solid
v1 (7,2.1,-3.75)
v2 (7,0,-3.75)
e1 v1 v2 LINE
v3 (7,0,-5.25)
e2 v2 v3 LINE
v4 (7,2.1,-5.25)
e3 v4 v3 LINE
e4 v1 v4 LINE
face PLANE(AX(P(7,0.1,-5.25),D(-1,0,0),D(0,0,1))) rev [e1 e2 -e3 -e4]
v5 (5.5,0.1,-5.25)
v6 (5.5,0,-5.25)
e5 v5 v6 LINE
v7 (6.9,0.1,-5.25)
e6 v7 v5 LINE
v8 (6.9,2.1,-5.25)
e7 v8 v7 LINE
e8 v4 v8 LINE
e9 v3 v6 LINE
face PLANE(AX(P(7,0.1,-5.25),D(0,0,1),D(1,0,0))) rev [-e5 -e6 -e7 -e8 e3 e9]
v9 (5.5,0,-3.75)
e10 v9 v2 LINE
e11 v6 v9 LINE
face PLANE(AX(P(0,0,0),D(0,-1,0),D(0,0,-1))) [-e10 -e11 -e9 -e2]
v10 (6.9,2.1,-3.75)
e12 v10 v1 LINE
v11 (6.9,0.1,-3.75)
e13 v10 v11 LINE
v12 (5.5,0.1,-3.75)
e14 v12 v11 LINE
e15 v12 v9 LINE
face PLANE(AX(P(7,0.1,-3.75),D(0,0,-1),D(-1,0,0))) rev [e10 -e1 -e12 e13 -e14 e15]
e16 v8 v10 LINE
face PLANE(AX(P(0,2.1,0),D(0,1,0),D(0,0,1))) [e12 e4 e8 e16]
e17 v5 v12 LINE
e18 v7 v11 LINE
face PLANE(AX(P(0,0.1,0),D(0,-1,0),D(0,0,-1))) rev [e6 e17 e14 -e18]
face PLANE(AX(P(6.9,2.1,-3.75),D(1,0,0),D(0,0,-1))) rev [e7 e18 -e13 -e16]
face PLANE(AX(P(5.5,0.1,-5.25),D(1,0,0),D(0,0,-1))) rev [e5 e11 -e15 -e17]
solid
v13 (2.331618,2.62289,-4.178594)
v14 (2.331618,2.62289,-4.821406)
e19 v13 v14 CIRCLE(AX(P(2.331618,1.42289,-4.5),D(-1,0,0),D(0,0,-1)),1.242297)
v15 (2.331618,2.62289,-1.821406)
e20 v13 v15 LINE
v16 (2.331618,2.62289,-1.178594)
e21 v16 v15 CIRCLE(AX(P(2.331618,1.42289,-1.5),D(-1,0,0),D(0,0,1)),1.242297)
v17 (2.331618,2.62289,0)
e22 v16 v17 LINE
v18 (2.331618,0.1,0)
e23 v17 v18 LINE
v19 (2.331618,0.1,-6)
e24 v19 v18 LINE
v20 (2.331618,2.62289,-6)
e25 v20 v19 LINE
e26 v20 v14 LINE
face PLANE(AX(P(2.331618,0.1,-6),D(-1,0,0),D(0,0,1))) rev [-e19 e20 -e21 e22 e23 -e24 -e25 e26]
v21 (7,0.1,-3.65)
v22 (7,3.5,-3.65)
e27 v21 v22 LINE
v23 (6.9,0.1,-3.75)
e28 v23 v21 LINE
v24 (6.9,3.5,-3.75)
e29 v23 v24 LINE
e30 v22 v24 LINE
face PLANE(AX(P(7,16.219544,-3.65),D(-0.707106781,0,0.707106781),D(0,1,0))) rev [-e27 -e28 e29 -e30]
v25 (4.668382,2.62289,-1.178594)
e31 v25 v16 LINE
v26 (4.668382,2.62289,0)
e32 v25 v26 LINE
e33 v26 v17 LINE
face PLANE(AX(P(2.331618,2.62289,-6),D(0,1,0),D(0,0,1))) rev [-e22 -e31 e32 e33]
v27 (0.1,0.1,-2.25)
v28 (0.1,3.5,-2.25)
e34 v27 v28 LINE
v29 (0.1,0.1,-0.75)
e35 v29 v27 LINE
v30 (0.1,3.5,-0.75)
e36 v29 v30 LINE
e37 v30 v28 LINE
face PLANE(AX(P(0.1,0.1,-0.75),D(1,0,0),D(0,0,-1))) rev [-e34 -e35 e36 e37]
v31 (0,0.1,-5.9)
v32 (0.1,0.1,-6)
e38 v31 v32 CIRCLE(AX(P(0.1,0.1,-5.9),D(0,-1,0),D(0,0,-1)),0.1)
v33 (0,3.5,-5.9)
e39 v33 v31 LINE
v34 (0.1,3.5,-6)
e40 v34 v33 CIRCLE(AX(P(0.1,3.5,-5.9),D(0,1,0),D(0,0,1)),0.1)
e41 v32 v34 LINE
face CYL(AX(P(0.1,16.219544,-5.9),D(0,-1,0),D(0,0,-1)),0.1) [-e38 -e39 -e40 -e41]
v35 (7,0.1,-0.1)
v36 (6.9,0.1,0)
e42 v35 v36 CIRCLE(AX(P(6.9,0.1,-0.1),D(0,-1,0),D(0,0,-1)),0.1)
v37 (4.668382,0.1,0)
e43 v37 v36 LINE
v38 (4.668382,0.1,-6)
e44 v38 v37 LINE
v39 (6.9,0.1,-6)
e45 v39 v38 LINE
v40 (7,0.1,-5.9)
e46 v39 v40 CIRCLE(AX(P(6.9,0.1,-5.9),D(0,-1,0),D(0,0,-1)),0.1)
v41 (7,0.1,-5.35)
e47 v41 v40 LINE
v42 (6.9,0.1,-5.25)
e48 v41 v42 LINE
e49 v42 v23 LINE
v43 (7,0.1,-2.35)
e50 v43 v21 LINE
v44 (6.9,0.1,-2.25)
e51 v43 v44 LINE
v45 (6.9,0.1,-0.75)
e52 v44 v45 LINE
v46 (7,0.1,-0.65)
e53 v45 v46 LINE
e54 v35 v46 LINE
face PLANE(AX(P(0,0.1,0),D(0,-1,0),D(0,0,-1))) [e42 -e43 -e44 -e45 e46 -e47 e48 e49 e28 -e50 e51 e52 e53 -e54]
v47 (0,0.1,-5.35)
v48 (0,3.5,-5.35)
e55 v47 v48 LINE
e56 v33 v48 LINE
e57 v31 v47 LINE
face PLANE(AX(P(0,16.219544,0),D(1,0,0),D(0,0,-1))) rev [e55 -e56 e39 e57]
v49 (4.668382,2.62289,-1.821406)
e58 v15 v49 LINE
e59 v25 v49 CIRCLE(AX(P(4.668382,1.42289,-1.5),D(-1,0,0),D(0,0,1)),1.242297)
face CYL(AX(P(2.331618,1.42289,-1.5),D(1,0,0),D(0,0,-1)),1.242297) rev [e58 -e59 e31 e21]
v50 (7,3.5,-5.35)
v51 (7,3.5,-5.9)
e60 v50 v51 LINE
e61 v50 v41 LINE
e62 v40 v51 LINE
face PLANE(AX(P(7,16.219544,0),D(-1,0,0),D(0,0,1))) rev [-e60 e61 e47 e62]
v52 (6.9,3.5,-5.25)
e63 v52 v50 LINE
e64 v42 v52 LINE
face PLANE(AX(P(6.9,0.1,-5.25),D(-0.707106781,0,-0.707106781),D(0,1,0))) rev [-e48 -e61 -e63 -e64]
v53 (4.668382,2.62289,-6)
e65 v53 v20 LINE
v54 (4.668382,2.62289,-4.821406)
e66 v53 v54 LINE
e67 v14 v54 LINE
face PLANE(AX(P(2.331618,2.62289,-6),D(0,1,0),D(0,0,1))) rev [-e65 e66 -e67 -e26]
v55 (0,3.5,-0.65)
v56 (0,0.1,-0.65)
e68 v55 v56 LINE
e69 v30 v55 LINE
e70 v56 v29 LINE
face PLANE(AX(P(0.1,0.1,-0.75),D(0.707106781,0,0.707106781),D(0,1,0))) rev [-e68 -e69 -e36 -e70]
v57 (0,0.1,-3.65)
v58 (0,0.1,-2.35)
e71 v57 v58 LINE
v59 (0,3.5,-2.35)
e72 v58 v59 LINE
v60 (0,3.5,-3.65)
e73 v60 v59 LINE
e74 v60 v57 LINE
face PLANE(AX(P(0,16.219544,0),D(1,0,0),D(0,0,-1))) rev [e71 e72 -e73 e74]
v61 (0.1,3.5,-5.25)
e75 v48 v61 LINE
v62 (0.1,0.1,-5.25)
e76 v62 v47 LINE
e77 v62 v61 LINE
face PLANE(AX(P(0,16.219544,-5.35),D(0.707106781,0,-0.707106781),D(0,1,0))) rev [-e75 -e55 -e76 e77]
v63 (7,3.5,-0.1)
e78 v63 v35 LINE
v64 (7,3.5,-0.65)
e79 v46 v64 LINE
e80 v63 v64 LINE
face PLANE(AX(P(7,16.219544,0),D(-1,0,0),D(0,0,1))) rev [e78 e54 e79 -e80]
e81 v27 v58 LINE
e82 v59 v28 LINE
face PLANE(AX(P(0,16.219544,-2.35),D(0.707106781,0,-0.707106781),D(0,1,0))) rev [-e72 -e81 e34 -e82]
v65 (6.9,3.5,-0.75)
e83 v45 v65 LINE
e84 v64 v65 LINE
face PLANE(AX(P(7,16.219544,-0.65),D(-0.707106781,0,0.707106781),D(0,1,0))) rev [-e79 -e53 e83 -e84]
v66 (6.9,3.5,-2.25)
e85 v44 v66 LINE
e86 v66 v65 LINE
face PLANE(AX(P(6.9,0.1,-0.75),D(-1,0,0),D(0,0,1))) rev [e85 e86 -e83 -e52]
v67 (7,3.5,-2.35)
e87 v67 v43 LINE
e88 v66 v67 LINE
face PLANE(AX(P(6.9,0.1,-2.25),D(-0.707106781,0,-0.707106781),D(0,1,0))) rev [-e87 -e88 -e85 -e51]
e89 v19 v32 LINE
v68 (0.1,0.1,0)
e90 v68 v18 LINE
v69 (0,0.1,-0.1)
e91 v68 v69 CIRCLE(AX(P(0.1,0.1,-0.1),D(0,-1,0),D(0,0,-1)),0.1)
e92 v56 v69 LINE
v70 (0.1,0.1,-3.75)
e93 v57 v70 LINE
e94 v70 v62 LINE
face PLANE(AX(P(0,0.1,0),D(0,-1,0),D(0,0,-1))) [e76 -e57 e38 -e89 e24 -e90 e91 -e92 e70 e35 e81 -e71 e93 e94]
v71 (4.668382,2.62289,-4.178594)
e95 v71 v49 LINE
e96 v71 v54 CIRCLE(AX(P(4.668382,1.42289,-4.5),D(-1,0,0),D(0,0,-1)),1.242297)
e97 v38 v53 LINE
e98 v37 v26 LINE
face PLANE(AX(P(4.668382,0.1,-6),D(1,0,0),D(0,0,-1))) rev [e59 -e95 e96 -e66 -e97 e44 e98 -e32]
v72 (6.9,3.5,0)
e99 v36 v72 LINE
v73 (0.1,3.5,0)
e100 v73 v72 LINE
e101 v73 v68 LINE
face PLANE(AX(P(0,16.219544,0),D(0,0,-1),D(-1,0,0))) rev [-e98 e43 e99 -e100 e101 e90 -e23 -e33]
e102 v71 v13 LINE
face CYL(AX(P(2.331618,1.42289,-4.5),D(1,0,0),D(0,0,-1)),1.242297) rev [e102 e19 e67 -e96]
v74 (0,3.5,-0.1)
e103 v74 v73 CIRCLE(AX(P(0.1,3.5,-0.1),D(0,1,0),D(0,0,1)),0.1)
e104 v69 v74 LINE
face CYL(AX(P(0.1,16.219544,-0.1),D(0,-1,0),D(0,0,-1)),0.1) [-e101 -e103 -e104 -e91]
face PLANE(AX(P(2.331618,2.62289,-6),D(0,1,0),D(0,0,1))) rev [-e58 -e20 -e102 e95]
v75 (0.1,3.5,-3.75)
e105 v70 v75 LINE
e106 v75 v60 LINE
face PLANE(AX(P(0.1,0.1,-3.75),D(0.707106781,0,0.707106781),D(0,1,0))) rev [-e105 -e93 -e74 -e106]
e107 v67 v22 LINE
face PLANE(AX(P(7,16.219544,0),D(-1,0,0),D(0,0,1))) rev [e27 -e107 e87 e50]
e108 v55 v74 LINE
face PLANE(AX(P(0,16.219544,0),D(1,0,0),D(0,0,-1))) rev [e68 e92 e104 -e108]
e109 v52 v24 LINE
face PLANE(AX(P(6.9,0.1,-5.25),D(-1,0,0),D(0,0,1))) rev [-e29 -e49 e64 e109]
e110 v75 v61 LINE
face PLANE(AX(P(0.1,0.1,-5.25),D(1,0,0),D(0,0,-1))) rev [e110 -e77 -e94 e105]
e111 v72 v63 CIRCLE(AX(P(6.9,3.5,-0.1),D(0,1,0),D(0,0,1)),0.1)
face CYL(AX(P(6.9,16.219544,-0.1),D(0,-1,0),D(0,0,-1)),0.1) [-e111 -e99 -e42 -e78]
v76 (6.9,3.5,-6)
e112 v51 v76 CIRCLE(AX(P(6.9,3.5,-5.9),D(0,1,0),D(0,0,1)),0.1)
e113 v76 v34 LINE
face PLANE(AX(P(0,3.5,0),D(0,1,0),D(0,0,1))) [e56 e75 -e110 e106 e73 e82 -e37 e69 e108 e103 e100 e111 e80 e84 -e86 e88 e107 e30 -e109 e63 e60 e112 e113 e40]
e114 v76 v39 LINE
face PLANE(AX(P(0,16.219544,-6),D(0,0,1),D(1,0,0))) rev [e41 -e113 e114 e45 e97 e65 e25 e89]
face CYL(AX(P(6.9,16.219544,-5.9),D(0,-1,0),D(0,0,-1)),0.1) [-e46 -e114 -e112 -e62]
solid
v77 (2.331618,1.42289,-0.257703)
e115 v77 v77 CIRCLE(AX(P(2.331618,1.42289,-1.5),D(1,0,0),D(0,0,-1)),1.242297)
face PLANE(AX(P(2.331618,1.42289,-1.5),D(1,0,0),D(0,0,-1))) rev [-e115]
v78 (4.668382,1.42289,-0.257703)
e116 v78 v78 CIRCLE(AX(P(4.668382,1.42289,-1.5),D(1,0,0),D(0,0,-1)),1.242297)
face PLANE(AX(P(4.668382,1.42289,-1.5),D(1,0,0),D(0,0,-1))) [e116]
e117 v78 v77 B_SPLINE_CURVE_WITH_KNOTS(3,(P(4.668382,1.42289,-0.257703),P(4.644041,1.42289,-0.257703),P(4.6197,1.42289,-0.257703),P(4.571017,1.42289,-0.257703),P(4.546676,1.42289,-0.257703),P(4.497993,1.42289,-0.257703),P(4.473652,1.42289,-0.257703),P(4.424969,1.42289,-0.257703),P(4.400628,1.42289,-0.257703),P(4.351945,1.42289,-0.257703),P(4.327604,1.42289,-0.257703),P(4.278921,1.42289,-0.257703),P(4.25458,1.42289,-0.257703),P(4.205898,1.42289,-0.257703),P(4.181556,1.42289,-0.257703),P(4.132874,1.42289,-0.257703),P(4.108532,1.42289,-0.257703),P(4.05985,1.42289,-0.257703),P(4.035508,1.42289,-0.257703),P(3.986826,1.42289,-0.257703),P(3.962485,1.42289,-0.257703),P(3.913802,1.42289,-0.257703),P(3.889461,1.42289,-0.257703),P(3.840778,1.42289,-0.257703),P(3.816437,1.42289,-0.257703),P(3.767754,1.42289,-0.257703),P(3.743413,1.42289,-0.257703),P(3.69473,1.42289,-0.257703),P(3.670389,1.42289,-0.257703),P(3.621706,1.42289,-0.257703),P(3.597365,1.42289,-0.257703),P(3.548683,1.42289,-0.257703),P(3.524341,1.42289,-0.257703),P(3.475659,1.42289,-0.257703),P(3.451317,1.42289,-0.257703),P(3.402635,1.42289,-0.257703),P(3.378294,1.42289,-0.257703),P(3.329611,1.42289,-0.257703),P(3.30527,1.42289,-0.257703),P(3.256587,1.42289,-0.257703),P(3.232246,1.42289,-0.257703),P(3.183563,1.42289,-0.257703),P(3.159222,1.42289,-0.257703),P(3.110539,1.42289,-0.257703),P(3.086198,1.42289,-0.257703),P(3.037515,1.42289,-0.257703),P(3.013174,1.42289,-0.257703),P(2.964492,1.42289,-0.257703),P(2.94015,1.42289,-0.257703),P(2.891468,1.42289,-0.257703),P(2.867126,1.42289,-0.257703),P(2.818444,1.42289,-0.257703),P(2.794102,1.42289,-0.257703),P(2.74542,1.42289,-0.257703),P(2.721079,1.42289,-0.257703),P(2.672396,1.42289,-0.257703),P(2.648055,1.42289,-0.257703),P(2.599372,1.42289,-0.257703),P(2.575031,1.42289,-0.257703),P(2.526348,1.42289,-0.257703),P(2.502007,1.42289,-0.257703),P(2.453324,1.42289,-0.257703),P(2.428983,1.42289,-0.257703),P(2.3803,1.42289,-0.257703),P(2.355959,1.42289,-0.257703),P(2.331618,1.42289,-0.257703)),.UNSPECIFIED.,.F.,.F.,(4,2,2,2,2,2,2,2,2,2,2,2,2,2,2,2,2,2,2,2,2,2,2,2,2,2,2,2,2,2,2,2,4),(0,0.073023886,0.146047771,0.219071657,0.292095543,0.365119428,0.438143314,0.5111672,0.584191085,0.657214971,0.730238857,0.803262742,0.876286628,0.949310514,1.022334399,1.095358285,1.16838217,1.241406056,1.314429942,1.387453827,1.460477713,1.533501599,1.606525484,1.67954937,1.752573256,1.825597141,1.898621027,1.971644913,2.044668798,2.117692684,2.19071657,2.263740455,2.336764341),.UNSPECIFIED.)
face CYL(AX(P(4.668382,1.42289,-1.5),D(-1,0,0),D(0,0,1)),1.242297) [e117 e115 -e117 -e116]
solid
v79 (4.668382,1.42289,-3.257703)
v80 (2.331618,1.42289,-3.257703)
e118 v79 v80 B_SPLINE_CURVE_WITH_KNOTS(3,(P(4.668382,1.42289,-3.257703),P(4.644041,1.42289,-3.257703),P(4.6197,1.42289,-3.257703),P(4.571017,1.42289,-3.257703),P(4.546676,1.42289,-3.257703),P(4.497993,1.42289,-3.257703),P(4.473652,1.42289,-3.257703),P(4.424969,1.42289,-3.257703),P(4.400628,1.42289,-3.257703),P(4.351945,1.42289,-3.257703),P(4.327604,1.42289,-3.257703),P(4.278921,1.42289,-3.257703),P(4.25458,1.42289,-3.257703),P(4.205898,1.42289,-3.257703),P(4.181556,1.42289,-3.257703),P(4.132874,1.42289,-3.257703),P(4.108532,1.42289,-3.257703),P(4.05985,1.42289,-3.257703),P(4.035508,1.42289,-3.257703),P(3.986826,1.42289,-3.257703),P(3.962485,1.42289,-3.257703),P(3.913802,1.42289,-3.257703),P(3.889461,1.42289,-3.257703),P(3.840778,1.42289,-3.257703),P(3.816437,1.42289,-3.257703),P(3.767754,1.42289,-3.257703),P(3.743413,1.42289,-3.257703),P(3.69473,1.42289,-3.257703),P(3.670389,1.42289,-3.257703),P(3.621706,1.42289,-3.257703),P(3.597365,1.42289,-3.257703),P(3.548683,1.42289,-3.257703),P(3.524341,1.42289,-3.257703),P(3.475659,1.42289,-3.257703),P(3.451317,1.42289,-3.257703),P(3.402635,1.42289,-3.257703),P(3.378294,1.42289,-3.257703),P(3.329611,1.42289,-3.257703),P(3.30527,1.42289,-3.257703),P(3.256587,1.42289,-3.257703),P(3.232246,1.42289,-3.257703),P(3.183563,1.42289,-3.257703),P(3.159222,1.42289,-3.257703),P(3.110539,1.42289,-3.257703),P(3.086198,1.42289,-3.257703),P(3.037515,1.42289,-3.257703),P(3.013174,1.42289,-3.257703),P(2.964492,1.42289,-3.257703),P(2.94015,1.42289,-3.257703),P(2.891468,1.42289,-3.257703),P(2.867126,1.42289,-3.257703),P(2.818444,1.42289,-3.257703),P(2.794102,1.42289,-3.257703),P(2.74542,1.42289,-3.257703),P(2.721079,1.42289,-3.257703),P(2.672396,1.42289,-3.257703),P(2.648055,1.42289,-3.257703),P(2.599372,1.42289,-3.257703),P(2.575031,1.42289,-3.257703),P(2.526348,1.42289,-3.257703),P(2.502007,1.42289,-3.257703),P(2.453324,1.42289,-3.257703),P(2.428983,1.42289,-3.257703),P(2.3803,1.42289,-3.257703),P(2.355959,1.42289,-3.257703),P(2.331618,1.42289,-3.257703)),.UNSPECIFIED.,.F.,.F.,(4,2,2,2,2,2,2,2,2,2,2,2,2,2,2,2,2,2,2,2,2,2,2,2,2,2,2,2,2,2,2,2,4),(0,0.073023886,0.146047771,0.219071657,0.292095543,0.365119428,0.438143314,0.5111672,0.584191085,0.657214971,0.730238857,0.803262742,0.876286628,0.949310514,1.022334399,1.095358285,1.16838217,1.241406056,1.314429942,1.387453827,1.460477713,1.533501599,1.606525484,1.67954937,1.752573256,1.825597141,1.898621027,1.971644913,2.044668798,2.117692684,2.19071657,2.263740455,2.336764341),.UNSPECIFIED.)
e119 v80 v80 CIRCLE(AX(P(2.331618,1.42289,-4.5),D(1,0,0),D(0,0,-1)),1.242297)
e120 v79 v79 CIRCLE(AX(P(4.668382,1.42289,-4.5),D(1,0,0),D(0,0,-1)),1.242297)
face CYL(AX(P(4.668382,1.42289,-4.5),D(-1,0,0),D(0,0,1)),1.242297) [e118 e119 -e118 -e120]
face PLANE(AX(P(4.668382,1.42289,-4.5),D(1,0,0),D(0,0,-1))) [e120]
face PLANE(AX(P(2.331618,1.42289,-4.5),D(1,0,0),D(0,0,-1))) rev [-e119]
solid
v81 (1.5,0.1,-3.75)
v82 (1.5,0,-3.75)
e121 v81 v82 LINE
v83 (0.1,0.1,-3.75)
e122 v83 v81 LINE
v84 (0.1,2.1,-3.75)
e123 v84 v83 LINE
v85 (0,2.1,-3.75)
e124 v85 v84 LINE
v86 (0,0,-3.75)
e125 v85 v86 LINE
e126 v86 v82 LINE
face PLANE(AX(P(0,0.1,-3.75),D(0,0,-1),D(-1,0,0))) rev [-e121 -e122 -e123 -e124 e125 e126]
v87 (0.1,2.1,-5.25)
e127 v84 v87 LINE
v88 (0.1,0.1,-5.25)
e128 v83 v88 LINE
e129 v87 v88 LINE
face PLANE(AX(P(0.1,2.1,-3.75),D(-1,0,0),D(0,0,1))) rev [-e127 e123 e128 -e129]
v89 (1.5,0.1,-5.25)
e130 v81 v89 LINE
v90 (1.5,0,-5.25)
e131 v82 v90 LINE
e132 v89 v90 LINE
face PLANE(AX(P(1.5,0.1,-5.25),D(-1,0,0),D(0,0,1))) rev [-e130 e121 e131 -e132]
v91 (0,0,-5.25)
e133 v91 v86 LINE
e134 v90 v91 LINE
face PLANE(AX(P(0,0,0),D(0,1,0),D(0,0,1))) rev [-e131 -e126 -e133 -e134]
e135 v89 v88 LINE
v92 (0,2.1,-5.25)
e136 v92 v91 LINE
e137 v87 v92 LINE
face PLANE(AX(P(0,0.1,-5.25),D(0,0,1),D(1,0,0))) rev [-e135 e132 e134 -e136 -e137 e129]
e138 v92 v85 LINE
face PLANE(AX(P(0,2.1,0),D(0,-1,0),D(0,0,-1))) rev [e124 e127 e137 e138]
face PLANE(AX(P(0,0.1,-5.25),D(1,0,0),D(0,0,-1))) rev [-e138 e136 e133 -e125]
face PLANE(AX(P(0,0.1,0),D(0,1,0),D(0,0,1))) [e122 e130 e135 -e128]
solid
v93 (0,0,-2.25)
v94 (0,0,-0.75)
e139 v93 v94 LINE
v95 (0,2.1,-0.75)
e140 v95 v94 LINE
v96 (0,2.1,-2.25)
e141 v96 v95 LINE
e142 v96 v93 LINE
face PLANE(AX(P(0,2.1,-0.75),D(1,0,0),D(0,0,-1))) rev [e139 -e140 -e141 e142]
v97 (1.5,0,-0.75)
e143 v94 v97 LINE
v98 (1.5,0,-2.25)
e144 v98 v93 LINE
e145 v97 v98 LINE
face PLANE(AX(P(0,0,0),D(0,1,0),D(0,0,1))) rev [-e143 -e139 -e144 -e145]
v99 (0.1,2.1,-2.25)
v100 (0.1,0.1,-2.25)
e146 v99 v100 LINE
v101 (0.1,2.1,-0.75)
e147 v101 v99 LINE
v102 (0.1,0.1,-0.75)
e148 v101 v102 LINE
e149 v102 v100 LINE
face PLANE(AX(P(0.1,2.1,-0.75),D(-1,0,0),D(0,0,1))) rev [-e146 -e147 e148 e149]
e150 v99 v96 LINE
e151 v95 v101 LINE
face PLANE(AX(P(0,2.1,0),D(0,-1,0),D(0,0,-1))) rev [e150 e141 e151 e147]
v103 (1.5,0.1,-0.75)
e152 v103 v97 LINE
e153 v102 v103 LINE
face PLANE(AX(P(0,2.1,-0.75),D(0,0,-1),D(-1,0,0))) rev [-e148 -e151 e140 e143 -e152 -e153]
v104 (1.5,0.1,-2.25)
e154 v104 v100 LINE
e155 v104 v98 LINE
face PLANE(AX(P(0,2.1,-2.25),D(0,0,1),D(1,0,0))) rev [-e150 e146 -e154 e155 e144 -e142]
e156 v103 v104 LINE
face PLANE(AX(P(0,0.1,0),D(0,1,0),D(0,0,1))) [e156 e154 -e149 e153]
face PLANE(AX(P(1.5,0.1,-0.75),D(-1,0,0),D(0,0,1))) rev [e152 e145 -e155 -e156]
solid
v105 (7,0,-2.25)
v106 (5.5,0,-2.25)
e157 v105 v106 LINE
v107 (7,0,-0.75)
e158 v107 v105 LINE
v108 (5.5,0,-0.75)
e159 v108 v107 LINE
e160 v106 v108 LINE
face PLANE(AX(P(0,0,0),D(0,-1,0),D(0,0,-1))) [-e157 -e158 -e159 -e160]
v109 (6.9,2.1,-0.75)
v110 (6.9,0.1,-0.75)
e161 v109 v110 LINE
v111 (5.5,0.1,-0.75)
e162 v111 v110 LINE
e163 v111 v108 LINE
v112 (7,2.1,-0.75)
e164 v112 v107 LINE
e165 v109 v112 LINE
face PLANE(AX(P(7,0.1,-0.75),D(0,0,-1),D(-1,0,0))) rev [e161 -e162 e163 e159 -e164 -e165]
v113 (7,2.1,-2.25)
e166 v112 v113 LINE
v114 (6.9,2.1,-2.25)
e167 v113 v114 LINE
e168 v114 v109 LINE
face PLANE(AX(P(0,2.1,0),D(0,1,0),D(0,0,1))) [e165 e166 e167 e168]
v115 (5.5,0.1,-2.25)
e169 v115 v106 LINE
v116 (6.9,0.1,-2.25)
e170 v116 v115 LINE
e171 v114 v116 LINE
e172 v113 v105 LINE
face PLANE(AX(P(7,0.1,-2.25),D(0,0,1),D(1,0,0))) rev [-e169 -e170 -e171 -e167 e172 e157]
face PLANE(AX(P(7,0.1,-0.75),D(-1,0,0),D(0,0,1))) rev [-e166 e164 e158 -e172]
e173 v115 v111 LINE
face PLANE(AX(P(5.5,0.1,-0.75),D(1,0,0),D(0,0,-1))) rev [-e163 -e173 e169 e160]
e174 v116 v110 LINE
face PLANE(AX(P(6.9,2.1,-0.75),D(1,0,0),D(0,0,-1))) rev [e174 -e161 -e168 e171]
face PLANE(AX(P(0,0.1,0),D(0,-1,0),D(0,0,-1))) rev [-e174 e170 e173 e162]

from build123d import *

# Parameters (mm, degrees)
SKETCH2_W             = 1.5
SKETCH2_H             = 1.5
BOSS_EXTRUDE1_DEPTH   = 0.1
BOSS_EXTRUDE1_2_DEPTH = 0.1
BOSS_EXTRUDE1_3_DEPTH = 0.1
BOSS_EXTRUDE1_4_DEPTH = 0.1
BOSS_EXTRUDE2_START   = 0.1
SKETCH5_W             = 7
SKETCH5_H             = 6
BOSS_EXTRUDE2_DEPTH   = 3.4
SKETCH6_W             = 0.1
SKETCH6_H             = 1.5
CUT_EXTRUDE1_DEPTH    = 3.4
SKETCH7_W             = 0.1
SKETCH7_H             = 1.5
BOSS_EXTRUDE4_DEPTH   = 2
BOSS_EXTRUDE4_2_DEPTH = 2
BOSS_EXTRUDE4_3_DEPTH = 2
BOSS_EXTRUDE4_4_DEPTH = 2
CHAMFER1_SIZE         = 0.1
FILLET1_R             = 0.1
SKETCH8_W             = 2.33676434
SKETCH8_H             = 2.522890168
CUT_EXTRUDE2_DEPTH    = 10.861541462
SKETCH9_R             = 1.242296886
BOSS_EXTRUDE5_DEPTH   = 2.336762
BOSS_EXTRUDE5_2_DEPTH = 2.336762
SKETCH10_R            = 1.242296886
BOSS_EXTRUDE6_DEPTH   = 2.336764
BOSS_EXTRUDE6_2_DEPTH = 2.336764


with BuildPart() as part:
    # Sketch2 → Boss-Extrude1 (new body)
    with BuildSketch(Plane(origin=(0, 0, 0), x_dir=(1, 0, 0), z_dir=(0, 1, 0))):
        with Locations((6.25, 4.5)):
            Rectangle(SKETCH2_W, SKETCH2_H)
    extrude(amount=BOSS_EXTRUDE1_DEPTH)


with BuildPart() as body_2:
    # Sketch2 → Boss-Extrude1 2 (new body)
    with BuildSketch(Plane(origin=(0, 0, 0), x_dir=(1, 0, 0), z_dir=(0, 1, 0))):
        with Locations((0.75, 4.5)):
            Rectangle(SKETCH2_W, SKETCH2_H)
    extrude(amount=BOSS_EXTRUDE1_2_DEPTH)


with BuildPart() as body_3:
    # Sketch2 → Boss-Extrude1 3 (new body)
    with BuildSketch(Plane(origin=(0, 0, 0), x_dir=(1, 0, 0), z_dir=(0, 1, 0))):
        with Locations((6.25, 1.5)):
            Rectangle(SKETCH2_W, SKETCH2_H)
    extrude(amount=BOSS_EXTRUDE1_3_DEPTH)


with BuildPart() as body_4:
    # Sketch2 → Boss-Extrude1 4 (new body)
    with BuildSketch(Plane(origin=(0, 0, 0), x_dir=(1, 0, 0), z_dir=(0, 1, 0))):
        with Locations((0.75, 1.5)):
            Rectangle(SKETCH2_W, SKETCH2_H)
    extrude(amount=BOSS_EXTRUDE1_4_DEPTH)


with BuildPart() as body_5:
    # Sketch5 → Boss-Extrude2 (new body)
    with BuildSketch(Plane(origin=(0, 0, 0), x_dir=(1, 0, 0), z_dir=(0, 1, 0)).offset(BOSS_EXTRUDE2_START)):
        with Locations((3.5, 3)):
            Rectangle(SKETCH5_W, SKETCH5_H)
    extrude(amount=BOSS_EXTRUDE2_DEPTH)

    # Sketch6 → Cut-Extrude1 (cut)
    with BuildSketch(Plane(origin=(0, 3.5, 0), x_dir=(1, 0, 0), z_dir=(0, 1, 0))):
        with Locations((6.95, 1.5)):
            Rectangle(SKETCH6_W, SKETCH6_H)
        with Locations((6.95, 4.5)):
            Rectangle(SKETCH6_W, SKETCH6_H)
        with Locations((0.05, 4.5)):
            Rectangle(SKETCH6_W, SKETCH6_H)
        with Locations((0.05, 1.5)):
            Rectangle(SKETCH6_W, SKETCH6_H)
    extrude(amount=-CUT_EXTRUDE1_DEPTH, mode=Mode.SUBTRACT)

    # Chamfer1
    chamfer1_edges = [body_5.edges().sort_by_distance(p)[0] for p in [
        (0, 1.8, -0.75),
        (0, 1.8, -2.25),
        (0, 1.8, -3.75),
        (0, 1.8, -5.25),
        (7, 1.8, -5.25),
        (7, 1.8, -0.75),
        (7, 1.8, -3.75),
        (7, 1.8, -2.25),
    ]]
    chamfer(chamfer1_edges, length=CHAMFER1_SIZE - 0.0001)  # a hair under: the kernel refuses the full size

    # Fillet1
    fillet1_edges = [body_5.edges().sort_by_distance(p)[0] for p in [
        (0, 1.8, 0),
        (7, 1.8, 0),
        (7, 1.8, -6),
        (0, 1.8, -6),
    ]]
    fillet(fillet1_edges, radius=FILLET1_R)

    # Sketch8 → Cut-Extrude2 (cut, through all)
    with BuildSketch(Plane.XY):
        with Locations((3.5, 1.361445084)):
            Rectangle(SKETCH8_W, SKETCH8_H)
    extrude(amount=-CUT_EXTRUDE2_DEPTH, mode=Mode.SUBTRACT)


with BuildPart() as body_6:
    # Sketch7 → Boss-Extrude4 (new body)
    with BuildSketch(Plane(origin=(0, 0.1, 0), x_dir=(1, 0, 0), z_dir=(0, 1, 0))):
        with Locations((6.95, 1.5)):
            Rectangle(SKETCH7_W, SKETCH7_H)
    extrude(amount=BOSS_EXTRUDE4_DEPTH)


with BuildPart() as body_7:
    # Sketch7 → Boss-Extrude4 2 (new body)
    with BuildSketch(Plane(origin=(0, 0.1, 0), x_dir=(1, 0, 0), z_dir=(0, 1, 0))):
        with Locations((6.95, 4.5)):
            Rectangle(SKETCH7_W, SKETCH7_H)
    extrude(amount=BOSS_EXTRUDE4_2_DEPTH)


with BuildPart() as body_8:
    # Sketch7 → Boss-Extrude4 3 (new body)
    with BuildSketch(Plane(origin=(0, 0.1, 0), x_dir=(1, 0, 0), z_dir=(0, 1, 0))):
        with Locations((0.05, 1.5)):
            Rectangle(SKETCH7_W, SKETCH7_H)
    extrude(amount=BOSS_EXTRUDE4_3_DEPTH)

    # Combine1: union body 4
    add(body_4.part)


with BuildPart() as body_9:
    # Sketch7 → Boss-Extrude4 4 (new body)
    with BuildSketch(Plane(origin=(0, 0.1, 0), x_dir=(1, 0, 0), z_dir=(0, 1, 0))):
        with Locations((0.05, 4.5)):
            Rectangle(SKETCH7_W, SKETCH7_H)
    extrude(amount=BOSS_EXTRUDE4_4_DEPTH)


with BuildPart() as body_2_1:
    add(body_2.part)

    # Combine2: union body 9
    add(body_9.part)


with BuildPart() as part_1:
    add(part.part)

    # Combine3: union body 7
    add(body_7.part)


with BuildPart() as body_3_1:
    add(body_3.part)

    # Combine4: union body 6
    add(body_6.part)


with BuildPart() as body_6_2:
    # Sketch9 → Boss-Extrude5 (new body)
    with BuildSketch(Plane.ZY.offset(-4.66838217)):
        with Locations(Location((-1.5, 1.422890168, 0), (0, 0, 180))):
            Circle(SKETCH9_R)
    extrude(amount=BOSS_EXTRUDE5_DEPTH)


with BuildPart() as body_7_2:
    # Sketch9 → Boss-Extrude5 2 (new body)
    with BuildSketch(Plane.ZY.offset(-4.66838217)):
        with Locations(Location((-4.5, 1.422890168, 0), (0, 0, 180))):
            Circle(SKETCH9_R)
    extrude(amount=BOSS_EXTRUDE5_2_DEPTH)


with BuildPart() as body_5_1:
    add(body_5.part)

    # Combine6: cut body 6 2, body 7 2
    add(body_6_2.part, mode=Mode.SUBTRACT)
    add(body_7_2.part, mode=Mode.SUBTRACT)


with BuildPart() as body_6_3:
    # Sketch10 → Boss-Extrude6 (new body)
    with BuildSketch(Plane(origin=(2.33161783, 0, 0), x_dir=(0, 0, -1), z_dir=(1, 0, 0))):
        with Locations(Location((1.5, 1.422890168, 0), (0, 0, 180))):
            Circle(SKETCH10_R)
    extrude(amount=BOSS_EXTRUDE6_DEPTH)


with BuildPart() as body_7_3:
    # Sketch10 → Boss-Extrude6 2 (new body)
    with BuildSketch(Plane(origin=(2.33161783, 0, 0), x_dir=(0, 0, -1), z_dir=(1, 0, 0))):
        with Locations(Location((4.5, 1.422890168, 0), (0, 0, 180))):
            Circle(SKETCH10_R)
    extrude(amount=BOSS_EXTRUDE6_2_DEPTH)


solid = Compound([body_8.part, body_2_1.part, part_1.part, body_3_1.part, body_5_1.part, body_6_3.part, body_7_3.part])
